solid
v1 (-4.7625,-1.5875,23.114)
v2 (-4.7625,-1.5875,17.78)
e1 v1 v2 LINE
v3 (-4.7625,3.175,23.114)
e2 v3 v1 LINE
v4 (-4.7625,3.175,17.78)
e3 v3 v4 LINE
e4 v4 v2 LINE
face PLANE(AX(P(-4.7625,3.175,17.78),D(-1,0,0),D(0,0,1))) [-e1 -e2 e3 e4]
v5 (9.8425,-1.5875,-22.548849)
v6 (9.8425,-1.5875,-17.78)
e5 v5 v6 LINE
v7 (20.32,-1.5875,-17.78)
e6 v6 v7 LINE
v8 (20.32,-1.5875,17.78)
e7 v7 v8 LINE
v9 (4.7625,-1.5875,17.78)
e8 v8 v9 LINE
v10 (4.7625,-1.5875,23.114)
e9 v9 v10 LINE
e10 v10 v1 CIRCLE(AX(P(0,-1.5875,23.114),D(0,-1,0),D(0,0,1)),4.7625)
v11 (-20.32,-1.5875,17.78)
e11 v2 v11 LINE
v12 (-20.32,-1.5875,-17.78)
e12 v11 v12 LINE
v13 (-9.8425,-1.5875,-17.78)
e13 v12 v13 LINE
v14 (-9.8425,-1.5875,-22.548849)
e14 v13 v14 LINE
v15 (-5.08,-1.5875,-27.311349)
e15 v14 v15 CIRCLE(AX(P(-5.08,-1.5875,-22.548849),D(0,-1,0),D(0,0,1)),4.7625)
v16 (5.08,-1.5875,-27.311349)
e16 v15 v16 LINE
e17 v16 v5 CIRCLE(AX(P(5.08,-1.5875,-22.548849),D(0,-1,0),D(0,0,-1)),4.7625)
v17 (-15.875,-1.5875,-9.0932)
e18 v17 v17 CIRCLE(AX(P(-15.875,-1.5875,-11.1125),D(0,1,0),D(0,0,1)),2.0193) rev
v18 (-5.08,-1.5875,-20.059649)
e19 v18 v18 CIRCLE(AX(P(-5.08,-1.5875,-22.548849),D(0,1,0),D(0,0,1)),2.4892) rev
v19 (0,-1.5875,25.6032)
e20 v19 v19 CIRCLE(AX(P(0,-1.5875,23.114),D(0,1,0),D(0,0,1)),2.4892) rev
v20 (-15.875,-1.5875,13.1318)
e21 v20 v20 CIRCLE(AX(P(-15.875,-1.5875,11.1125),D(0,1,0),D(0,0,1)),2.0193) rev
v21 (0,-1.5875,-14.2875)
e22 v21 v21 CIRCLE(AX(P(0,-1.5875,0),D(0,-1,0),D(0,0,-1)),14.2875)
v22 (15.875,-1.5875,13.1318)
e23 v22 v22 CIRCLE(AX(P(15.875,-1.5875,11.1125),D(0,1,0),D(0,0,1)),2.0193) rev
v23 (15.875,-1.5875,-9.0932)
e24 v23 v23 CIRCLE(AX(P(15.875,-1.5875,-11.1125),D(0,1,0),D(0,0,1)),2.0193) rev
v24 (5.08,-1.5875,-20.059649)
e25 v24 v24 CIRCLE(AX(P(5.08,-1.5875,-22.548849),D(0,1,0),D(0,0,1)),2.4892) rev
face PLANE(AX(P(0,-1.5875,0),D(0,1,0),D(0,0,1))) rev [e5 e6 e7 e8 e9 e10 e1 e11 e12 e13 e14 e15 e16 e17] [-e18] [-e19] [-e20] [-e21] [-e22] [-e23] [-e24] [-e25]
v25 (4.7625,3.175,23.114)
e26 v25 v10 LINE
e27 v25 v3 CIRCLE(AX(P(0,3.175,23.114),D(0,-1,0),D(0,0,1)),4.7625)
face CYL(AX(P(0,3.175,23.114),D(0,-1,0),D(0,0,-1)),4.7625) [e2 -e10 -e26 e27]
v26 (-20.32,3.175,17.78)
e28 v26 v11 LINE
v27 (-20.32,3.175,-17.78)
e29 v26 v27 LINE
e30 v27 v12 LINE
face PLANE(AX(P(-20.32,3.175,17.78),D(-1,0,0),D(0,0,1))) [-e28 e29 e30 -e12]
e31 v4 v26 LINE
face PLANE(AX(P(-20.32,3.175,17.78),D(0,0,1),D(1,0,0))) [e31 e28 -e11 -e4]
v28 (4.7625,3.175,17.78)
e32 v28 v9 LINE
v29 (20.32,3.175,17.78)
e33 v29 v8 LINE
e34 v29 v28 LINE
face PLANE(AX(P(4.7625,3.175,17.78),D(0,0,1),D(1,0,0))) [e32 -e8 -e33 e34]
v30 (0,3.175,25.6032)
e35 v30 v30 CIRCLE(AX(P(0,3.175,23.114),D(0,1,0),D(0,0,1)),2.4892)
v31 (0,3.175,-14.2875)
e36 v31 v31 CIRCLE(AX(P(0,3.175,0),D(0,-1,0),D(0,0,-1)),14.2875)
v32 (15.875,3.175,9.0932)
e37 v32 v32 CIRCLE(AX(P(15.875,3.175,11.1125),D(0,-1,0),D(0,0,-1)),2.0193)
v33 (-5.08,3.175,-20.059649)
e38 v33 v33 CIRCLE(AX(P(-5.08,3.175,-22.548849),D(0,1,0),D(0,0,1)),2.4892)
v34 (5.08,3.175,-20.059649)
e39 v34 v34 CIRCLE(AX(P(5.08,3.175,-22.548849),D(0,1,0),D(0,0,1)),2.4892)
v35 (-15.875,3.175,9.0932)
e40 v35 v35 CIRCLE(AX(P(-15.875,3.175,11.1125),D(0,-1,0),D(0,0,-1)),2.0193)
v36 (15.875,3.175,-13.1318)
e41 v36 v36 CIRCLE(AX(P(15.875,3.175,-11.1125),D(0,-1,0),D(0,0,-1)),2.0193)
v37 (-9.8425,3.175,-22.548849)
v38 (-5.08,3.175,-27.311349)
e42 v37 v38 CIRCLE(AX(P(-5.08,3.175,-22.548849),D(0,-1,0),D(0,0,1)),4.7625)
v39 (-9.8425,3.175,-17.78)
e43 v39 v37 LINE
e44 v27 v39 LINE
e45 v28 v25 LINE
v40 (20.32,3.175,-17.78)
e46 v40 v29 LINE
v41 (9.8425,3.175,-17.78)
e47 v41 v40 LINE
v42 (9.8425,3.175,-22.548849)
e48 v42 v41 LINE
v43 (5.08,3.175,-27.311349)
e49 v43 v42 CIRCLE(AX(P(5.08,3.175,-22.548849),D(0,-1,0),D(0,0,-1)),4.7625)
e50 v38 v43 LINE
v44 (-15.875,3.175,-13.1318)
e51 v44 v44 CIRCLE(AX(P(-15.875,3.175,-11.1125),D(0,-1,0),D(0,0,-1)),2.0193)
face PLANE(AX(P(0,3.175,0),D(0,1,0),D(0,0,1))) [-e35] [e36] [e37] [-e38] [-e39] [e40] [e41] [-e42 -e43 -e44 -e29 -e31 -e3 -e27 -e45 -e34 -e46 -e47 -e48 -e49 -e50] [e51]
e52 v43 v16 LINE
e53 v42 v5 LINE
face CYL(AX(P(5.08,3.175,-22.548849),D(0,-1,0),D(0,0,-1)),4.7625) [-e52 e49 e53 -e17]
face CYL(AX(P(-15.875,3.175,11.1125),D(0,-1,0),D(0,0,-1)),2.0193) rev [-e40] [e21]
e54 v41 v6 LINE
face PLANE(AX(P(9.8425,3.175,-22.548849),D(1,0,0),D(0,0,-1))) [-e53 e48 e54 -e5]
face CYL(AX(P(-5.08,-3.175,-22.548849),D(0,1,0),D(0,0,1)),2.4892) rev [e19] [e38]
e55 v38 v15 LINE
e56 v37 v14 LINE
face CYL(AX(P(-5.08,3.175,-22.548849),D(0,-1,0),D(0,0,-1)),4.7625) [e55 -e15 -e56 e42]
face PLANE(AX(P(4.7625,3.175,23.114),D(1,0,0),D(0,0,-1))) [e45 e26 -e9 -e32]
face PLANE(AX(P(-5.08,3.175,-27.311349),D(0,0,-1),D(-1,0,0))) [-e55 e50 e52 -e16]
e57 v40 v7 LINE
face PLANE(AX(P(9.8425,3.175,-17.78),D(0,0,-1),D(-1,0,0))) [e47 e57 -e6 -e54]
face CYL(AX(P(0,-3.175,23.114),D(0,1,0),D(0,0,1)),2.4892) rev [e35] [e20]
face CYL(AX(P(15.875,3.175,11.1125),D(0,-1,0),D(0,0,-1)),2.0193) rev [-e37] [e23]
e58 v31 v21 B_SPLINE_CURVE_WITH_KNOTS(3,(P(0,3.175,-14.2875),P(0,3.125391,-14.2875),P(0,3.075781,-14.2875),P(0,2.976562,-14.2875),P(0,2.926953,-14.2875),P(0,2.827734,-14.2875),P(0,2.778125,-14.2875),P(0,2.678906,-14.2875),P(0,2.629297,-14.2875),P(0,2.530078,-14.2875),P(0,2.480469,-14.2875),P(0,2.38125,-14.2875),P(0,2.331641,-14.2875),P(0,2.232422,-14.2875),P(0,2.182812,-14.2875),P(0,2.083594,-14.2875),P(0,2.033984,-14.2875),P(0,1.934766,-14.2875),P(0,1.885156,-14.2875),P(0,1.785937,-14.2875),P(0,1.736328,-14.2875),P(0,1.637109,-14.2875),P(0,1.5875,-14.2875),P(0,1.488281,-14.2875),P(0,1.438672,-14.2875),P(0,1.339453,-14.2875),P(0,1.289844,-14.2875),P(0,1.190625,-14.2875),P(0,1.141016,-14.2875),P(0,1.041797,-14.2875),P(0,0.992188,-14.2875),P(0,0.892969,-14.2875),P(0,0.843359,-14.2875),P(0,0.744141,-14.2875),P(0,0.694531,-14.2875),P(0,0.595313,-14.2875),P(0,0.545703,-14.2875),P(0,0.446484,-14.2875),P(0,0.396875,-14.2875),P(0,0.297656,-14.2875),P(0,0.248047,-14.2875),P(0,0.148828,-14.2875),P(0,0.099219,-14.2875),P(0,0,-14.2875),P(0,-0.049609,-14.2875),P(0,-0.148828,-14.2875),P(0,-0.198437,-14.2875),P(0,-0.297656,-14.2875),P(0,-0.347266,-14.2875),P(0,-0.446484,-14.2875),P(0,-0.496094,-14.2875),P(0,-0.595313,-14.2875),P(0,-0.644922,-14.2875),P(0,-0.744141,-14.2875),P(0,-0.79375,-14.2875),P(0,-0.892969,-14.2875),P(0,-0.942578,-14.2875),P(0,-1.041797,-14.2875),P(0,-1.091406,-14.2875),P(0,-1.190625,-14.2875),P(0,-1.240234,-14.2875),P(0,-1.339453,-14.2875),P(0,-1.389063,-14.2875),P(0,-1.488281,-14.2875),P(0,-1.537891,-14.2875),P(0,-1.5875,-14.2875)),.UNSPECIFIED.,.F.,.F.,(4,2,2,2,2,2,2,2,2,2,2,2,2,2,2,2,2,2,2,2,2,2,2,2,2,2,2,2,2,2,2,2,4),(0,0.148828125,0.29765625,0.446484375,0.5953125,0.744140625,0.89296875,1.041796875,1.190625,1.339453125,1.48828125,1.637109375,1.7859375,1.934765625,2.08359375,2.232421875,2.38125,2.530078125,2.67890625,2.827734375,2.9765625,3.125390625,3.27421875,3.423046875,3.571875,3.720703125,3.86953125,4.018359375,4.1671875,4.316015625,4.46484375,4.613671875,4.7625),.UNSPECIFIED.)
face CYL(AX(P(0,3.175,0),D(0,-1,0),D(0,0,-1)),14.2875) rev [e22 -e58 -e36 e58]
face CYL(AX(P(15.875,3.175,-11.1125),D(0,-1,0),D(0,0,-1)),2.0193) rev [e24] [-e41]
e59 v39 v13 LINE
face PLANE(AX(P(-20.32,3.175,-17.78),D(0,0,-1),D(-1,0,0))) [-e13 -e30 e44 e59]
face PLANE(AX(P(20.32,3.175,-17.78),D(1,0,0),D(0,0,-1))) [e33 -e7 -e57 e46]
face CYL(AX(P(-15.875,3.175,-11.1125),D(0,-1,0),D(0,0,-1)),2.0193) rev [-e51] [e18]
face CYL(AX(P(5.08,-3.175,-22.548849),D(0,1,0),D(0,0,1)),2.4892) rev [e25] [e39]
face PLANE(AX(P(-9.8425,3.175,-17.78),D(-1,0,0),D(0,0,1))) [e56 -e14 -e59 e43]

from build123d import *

# Parameters (mm, degrees)
SKETCH1_R              = 44.45
SKETCH1_R_2            = 6.35
BOSS_EXTRUDE1_DEPTH    = 3.175
SKETCH3_R              = 44.45
SKETCH3_R_2            = 27.94
CUT_EXTRUDE2_DEPTH     = 64.181702256
SKETCH7_R              = 2.4892
CUT_EXTRUDE6_DEPTH     = 41.020116192
SKETCH8_R              = 2.0193
CUT_EXTRUDE7_DEPTH     = 41.020116192
CUT_EXTRUDE8_START     = -1.5875
SKETCH9_R              = 27.94
CUT_EXTRUDE8_DEPTH     = 1.5875
CUT_EXTRUDE9_START     = -4.7625
CUT_EXTRUDE9_OUTLINE_R = 27.94
CUT_EXTRUDE9_DEPTH     = 4.7625
SKETCH11_R             = 14.2875
CUT_EXTRUDE10_DEPTH    = 35.823599161


# Read off the part's stored shape, not the designer's step: Cut-Extrude9
with BuildPart() as part:
    # Sketch1 → Boss-Extrude1 (new, symmetric)
    with BuildSketch(Plane(origin=(0, 0, 0), x_dir=(1, 0, 0), z_dir=(0, 1, 0))):
        with Locations(Location((0, 0, 0), (0, 0, 270))):
            Circle(SKETCH1_R)
        with Locations(Location((0, 0, 0), (0, 0, 270))):
            Circle(SKETCH1_R_2, mode=Mode.SUBTRACT)
    extrude(amount=BOSS_EXTRUDE1_DEPTH, both=True)

    # Sketch3 → Cut-Extrude2 (cut, through all)
    with BuildSketch(Plane(origin=(0, 3.175, 0), x_dir=(1, 0, 0), z_dir=(0, 1, 0))):
        Circle(SKETCH3_R)
        with Locations(Location((0, 0, 0), (0, 0, 270))):
            Circle(SKETCH3_R_2, mode=Mode.SUBTRACT)
    extrude(amount=-CUT_EXTRUDE2_DEPTH, mode=Mode.SUBTRACT)

    # Sketch7 → Cut-Extrude6 (cut, through all)
    with BuildSketch(Plane(origin=(0, 3.175, 0), x_dir=(1, 0, 0), z_dir=(0, 1, 0))):
        with Locations(Location((0, -23.114, 0), (0, 0, 270))):
            Circle(SKETCH7_R)
        with Locations(Location((-5.08, 22.548849106, 0), (0, 0, 270))):
            Circle(SKETCH7_R)
        with Locations(Location((5.08, 22.548849106, 0), (0, 0, 270))):
            Circle(SKETCH7_R)
    extrude(amount=-CUT_EXTRUDE6_DEPTH, mode=Mode.SUBTRACT)

    # Sketch8 → Cut-Extrude7 (cut, through all)
    with BuildSketch(Plane.XZ.offset(3.175)):
        with Locations(Location((-15.875, 11.1125, 0), (0, 0, 270))):
            Circle(SKETCH8_R)
        with Locations(Location((15.875, 11.1125, 0), (0, 0, 270))):
            Circle(SKETCH8_R)
        with Locations(Location((15.875, -11.1125, 0), (0, 0, 270))):
            Circle(SKETCH8_R)
        with Locations(Location((-15.875, -11.1125, 0), (0, 0, 270))):
            Circle(SKETCH8_R)
    extrude(amount=-CUT_EXTRUDE7_DEPTH, mode=Mode.SUBTRACT)

    # Sketch9 → Cut-Extrude8 (cut)
    with BuildSketch(Plane.XZ.offset(3.175).offset(CUT_EXTRUDE8_START)):
        with Locations(Location((0, 0, 0), (0, 0, 90))):
            Circle(SKETCH9_R)
    extrude(amount=CUT_EXTRUDE8_DEPTH, mode=Mode.SUBTRACT)

    # Cut-Extrude9 outline → Cut-Extrude9 (cut)
    with BuildSketch(Plane.XZ.offset(1.5875).offset(CUT_EXTRUDE9_START)):
        Circle(CUT_EXTRUDE9_OUTLINE_R)
        with BuildLine():
            Line((-20.32, 17.78), (-4.7625, 17.78))
            Line((-4.7625, 17.78), (-4.7625, 23.114))
            ThreePointArc((-4.7625, 23.114), (0, 27.8765), (4.7625, 23.114))
            Line((4.7625, 23.114), (4.7625, 17.78))
            Line((4.7625, 17.78), (20.32, 17.78))
            Line((20.32, 17.78), (20.32, -17.78))
            Line((20.32, -17.78), (9.8425, -17.78))
            Line((9.8425, -17.78), (9.8425, -22.548849106))
            ThreePointArc((9.8425, -22.548849106), (8.447596045, -25.916445151), (5.08, -27.311349106))
            Line((5.08, -27.311349106), (-5.08, -27.311349106))
            ThreePointArc((-5.08, -27.311349106), (-8.447596045, -25.916445151), (-9.8425, -22.548849106))
            Line((-9.8425, -22.548849106), (-9.8425, -17.78))
            Line((-9.8425, -17.78), (-20.32, -17.78))
            Line((-20.32, -17.78), (-20.32, 17.78))
        make_face(mode=Mode.SUBTRACT)
    extrude(amount=CUT_EXTRUDE9_DEPTH, mode=Mode.SUBTRACT)

    # Sketch11 → Cut-Extrude10 (cut, through all)
    with BuildSketch(Plane.XZ.offset(1.5875)):
        with Locations(Location((0, 0, 0), (0, 0, 270))):
            Circle(SKETCH11_R)
    extrude(amount=-CUT_EXTRUDE10_DEPTH, mode=Mode.SUBTRACT)


solid = part.part
